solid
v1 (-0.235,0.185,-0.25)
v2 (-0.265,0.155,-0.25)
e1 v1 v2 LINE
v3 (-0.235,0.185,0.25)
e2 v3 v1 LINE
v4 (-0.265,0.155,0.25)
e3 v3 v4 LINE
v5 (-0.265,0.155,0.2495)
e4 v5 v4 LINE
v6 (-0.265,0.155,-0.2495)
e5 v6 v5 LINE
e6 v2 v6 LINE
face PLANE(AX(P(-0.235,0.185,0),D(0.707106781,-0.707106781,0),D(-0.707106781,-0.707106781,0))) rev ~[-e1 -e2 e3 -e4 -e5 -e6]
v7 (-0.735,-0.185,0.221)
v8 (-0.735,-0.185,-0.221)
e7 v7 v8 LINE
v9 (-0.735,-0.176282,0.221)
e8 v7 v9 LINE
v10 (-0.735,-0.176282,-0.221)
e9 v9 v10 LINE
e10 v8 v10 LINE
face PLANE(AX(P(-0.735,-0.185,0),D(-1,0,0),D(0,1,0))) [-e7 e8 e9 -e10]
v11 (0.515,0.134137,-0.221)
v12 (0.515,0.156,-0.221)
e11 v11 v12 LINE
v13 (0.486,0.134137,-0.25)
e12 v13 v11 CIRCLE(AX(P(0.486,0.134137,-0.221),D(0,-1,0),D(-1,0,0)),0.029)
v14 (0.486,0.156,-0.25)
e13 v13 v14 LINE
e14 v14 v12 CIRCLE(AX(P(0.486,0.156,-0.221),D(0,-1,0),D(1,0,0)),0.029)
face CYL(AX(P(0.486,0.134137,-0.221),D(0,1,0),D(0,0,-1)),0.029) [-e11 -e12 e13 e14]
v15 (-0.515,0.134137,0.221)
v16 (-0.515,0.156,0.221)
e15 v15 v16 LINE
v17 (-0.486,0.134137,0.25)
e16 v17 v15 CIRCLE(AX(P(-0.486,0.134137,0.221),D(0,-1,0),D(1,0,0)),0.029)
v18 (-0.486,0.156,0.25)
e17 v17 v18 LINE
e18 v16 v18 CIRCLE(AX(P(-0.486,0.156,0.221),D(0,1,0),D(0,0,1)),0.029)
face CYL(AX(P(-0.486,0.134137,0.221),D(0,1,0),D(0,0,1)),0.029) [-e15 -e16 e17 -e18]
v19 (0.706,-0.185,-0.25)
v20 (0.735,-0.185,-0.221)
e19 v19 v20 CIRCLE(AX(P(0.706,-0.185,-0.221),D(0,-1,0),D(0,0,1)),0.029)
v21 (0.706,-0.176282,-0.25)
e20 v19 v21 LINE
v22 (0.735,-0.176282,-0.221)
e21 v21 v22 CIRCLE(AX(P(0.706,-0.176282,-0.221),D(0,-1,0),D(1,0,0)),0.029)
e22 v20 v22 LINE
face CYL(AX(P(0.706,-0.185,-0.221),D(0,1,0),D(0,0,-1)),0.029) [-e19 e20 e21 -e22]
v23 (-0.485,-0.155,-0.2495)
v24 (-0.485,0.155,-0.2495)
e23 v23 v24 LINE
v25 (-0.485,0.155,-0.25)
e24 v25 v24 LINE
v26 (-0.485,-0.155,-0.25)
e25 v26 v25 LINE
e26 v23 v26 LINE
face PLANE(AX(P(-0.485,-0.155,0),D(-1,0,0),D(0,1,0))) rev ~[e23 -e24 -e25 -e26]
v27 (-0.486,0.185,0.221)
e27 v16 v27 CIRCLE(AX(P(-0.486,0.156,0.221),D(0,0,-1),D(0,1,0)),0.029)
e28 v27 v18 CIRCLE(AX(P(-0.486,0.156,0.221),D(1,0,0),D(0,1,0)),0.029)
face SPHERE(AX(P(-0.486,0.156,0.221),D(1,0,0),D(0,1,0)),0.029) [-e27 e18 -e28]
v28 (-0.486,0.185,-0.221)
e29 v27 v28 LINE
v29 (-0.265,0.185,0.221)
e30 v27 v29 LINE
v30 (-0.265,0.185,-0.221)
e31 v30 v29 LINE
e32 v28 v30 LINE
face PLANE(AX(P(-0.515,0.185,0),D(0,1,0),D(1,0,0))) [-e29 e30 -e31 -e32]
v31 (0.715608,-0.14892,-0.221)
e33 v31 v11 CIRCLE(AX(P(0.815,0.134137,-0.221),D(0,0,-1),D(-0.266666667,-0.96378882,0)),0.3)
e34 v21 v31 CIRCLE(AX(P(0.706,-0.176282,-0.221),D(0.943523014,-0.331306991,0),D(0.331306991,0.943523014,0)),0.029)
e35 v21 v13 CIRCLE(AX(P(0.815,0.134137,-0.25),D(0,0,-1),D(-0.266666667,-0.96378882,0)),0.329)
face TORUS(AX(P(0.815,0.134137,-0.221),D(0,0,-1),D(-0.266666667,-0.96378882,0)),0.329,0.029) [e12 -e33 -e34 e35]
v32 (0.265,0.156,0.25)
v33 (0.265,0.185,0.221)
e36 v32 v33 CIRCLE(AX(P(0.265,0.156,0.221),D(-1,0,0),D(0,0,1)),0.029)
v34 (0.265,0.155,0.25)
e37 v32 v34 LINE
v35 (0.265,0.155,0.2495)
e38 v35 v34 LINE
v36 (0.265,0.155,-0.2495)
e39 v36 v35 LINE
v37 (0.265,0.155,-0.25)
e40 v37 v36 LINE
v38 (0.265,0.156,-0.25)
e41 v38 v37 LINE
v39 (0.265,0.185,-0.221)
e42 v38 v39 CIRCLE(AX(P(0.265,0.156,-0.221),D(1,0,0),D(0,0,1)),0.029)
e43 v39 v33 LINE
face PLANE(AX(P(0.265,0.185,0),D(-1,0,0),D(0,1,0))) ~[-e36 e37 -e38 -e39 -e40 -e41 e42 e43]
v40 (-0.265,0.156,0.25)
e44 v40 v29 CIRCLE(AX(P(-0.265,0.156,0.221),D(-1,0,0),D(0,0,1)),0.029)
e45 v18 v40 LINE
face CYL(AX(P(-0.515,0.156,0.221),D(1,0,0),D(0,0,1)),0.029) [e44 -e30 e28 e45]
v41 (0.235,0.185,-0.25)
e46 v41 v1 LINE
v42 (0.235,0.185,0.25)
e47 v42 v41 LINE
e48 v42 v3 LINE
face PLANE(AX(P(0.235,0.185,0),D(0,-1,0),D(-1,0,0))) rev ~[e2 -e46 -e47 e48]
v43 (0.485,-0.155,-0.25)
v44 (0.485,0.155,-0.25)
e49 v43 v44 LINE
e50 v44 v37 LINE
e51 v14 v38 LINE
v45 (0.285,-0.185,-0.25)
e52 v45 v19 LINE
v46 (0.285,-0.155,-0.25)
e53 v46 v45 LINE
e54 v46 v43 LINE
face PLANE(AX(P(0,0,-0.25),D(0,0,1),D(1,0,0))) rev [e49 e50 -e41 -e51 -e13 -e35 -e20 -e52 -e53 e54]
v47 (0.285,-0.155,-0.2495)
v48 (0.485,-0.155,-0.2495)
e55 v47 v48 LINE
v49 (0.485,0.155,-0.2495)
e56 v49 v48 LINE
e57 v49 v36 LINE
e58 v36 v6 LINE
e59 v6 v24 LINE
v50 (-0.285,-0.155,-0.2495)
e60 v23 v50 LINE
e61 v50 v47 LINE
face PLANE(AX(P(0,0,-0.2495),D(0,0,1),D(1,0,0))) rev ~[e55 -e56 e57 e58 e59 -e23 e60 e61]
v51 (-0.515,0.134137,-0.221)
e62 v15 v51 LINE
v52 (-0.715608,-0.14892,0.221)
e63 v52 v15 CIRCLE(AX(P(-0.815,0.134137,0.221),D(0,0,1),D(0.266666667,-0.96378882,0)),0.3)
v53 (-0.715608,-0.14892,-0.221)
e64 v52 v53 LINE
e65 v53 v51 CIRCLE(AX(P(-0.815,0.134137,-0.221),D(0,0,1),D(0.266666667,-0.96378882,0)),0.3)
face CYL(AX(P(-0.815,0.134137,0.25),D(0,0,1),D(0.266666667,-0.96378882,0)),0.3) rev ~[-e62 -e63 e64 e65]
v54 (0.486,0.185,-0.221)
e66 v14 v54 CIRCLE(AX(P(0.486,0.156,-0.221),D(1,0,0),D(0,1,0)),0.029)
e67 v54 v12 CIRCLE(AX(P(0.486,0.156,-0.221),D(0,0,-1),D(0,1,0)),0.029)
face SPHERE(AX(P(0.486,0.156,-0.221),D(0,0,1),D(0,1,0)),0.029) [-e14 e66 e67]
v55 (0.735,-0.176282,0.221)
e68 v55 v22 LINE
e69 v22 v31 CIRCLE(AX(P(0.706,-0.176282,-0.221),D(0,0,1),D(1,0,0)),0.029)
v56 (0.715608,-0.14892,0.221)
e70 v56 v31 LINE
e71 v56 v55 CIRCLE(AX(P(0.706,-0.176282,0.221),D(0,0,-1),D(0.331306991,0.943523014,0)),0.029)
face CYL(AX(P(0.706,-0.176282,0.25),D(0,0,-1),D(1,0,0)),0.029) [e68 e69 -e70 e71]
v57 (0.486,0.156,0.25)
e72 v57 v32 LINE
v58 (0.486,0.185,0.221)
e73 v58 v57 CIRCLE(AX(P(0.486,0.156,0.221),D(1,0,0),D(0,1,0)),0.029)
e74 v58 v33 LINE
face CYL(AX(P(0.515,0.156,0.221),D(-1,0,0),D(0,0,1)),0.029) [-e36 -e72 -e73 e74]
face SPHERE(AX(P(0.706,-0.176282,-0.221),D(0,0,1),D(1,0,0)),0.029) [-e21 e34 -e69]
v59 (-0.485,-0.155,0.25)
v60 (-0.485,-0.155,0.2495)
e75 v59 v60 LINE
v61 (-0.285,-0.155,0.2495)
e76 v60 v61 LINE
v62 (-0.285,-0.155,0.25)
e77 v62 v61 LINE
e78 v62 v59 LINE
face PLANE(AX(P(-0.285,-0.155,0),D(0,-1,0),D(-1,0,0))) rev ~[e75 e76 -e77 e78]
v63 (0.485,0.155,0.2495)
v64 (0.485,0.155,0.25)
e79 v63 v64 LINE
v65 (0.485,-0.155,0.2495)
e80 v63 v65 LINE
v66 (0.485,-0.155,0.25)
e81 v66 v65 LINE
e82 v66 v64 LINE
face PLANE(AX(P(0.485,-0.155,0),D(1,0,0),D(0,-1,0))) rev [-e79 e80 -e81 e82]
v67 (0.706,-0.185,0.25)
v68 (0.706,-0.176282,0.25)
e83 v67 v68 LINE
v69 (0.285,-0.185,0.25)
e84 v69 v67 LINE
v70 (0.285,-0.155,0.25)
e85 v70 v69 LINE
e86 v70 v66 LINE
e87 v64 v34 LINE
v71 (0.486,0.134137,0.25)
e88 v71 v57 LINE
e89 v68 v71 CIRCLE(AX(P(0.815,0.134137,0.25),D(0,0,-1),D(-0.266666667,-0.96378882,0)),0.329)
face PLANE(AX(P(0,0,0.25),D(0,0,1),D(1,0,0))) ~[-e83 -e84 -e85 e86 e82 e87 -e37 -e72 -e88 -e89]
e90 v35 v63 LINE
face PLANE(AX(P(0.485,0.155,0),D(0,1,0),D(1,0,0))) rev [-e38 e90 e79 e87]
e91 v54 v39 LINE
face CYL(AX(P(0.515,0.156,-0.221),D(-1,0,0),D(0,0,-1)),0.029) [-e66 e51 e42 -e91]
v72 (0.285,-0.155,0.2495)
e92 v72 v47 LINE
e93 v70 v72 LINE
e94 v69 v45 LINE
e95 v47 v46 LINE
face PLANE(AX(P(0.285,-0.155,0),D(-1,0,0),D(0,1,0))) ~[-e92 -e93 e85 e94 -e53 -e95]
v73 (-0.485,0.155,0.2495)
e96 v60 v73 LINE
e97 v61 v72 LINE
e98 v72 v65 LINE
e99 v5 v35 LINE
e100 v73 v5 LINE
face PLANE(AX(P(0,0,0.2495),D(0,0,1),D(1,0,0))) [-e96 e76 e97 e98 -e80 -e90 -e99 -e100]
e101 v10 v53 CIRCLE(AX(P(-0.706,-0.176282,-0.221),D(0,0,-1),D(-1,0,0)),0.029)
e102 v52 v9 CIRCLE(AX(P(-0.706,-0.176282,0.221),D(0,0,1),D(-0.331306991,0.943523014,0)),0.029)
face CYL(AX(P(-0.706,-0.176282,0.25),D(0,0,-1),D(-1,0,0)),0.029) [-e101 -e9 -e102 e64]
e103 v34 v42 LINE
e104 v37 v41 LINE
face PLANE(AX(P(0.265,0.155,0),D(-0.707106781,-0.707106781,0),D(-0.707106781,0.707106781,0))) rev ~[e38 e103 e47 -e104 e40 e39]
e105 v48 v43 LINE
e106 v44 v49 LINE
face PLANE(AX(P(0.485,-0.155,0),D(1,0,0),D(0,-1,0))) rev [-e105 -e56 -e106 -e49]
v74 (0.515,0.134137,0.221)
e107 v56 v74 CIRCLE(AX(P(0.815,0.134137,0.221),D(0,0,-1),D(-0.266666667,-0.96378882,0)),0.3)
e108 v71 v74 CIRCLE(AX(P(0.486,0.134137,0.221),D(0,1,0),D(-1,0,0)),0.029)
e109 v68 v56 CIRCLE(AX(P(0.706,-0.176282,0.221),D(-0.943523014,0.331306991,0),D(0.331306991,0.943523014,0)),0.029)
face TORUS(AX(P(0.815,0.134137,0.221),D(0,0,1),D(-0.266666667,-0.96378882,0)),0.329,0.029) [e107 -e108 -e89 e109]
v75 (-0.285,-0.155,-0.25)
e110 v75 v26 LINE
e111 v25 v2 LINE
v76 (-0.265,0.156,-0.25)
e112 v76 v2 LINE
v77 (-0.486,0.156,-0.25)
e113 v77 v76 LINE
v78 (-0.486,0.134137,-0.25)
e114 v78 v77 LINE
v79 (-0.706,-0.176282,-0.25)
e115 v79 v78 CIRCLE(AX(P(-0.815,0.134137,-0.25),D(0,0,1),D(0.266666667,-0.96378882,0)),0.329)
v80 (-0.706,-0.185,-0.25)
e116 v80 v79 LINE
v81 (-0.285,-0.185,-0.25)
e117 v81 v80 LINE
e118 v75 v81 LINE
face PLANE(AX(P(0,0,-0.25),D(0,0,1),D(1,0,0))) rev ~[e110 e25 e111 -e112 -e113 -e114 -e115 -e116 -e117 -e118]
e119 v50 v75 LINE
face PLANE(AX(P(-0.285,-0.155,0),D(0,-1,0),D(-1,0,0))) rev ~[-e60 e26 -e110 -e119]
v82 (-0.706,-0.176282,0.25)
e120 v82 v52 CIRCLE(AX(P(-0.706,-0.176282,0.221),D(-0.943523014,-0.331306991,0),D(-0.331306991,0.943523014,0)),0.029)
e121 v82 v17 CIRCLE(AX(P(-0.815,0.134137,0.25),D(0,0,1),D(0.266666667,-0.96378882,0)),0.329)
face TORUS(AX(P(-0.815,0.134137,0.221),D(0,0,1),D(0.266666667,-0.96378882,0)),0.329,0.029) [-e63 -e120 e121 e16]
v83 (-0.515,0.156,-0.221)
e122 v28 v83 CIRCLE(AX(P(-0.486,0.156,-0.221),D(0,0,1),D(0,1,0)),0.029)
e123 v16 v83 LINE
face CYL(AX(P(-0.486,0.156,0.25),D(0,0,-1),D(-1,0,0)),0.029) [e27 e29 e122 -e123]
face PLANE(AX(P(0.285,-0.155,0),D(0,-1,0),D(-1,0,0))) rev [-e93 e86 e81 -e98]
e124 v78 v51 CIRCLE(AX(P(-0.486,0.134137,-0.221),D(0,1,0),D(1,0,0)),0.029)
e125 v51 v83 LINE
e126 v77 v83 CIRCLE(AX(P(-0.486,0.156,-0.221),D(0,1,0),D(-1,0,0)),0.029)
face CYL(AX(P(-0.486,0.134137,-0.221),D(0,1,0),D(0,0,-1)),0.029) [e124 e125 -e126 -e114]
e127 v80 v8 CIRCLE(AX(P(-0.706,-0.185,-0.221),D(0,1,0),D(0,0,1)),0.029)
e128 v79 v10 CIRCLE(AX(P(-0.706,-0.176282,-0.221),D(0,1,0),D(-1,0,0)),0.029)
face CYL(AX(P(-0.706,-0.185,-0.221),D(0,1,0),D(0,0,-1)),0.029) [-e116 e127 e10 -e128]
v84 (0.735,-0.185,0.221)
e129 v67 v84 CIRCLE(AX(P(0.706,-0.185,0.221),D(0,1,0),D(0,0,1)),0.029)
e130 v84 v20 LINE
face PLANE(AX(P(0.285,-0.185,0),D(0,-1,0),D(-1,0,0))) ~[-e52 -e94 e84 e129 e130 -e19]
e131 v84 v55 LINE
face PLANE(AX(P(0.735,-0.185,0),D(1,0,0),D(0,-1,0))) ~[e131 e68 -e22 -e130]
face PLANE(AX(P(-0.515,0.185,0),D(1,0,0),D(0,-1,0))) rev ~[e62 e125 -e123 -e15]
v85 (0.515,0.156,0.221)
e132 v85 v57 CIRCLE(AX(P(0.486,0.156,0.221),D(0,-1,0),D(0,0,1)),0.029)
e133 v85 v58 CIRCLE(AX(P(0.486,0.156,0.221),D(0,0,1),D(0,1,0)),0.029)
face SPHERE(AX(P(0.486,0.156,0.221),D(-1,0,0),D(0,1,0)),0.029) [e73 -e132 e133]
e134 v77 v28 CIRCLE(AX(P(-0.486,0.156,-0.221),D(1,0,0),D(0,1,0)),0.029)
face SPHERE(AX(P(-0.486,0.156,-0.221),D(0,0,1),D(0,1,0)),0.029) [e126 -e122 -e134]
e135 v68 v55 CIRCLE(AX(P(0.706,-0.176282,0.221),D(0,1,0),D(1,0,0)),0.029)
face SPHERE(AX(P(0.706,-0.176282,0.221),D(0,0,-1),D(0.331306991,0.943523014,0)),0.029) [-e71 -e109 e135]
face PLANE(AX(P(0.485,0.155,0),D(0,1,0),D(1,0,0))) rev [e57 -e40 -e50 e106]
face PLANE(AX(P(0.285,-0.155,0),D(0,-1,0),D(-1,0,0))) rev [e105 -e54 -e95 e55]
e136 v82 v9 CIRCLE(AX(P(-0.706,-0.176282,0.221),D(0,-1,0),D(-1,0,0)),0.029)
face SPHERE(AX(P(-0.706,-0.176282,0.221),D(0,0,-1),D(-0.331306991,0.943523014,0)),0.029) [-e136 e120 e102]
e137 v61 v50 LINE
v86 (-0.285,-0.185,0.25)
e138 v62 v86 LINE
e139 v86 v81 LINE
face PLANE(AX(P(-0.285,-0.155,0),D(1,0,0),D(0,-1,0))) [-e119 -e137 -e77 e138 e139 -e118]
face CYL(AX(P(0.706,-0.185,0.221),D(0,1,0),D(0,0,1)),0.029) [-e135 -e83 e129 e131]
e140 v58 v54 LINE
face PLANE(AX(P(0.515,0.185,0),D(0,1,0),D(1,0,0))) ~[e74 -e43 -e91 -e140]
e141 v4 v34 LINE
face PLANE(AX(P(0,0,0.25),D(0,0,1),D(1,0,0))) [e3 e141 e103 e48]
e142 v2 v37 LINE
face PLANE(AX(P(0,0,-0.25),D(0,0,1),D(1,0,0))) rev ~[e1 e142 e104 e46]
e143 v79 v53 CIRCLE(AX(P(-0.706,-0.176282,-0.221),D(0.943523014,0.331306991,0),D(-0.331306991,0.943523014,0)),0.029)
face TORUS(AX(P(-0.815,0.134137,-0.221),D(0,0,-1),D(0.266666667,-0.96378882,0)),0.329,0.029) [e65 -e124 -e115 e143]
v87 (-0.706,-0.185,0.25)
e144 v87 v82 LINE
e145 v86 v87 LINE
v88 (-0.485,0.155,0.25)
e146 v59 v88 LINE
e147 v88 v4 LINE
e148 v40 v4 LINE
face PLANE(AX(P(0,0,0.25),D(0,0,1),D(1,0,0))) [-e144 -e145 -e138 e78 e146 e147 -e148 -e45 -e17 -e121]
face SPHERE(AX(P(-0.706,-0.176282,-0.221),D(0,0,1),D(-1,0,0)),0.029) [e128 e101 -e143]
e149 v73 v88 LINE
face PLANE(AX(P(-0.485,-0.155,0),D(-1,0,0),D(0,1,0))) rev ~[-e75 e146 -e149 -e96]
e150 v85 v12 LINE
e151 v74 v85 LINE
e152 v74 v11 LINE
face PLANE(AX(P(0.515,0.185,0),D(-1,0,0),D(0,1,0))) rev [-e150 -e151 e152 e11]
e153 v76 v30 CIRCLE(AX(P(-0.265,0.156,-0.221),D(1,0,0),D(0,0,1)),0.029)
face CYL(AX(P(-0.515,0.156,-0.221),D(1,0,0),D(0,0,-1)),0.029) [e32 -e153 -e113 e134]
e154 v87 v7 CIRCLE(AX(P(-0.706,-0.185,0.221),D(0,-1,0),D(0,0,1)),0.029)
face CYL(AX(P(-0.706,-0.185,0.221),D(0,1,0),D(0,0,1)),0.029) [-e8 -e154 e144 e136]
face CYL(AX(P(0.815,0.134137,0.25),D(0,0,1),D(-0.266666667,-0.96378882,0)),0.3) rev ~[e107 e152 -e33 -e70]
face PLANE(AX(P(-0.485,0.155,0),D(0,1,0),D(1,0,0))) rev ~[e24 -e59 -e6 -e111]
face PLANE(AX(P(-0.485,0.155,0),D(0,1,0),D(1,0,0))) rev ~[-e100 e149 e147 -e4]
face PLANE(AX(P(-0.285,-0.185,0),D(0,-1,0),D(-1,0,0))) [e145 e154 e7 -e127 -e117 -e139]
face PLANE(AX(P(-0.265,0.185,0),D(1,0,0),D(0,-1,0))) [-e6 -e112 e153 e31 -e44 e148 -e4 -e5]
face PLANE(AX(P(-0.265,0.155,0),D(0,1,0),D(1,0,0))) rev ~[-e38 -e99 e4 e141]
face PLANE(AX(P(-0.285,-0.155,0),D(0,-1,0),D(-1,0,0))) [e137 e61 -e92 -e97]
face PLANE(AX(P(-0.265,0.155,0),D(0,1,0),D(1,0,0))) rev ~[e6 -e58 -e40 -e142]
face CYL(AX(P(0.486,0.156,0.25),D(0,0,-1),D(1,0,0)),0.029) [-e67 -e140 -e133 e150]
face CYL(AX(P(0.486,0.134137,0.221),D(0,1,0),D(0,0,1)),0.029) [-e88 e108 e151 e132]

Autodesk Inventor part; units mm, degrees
ref_plane "YZ Plane" through (0, 0, 0) normal (1, 0, 0) x (0, 1, 0)
ref_plane "XZ Plane" through (0, 0, 0) normal (0, 1, 0) x (-1, 0, 0)
ref_plane "XY Plane" through (0, 0, 0) normal (0, 0, 1) x (1, 0, 0)
sketch "Sketch10" plane through (0, 0, 0) normal (0, 0, 1) x (1, 0, 0)
  line L0 (-0.485, 0.155) -> (0.485, 0.155)
  line L1 (0.485, 0.155) -> (0.485, -0.155)
  line L2 (0.485, -0.155) -> (-0.485, -0.155)
  line L3 (-0.485, -0.155) -> (-0.485, 0.155)
  line L4 (-0.265, 0.155) -> (-0.485, 0.155)
  line L5 (-0.515, 0.185) -> (-0.265, 0.185)
  line L6 (-0.265, 0.185) -> (-0.265, 0.155)
  line L7 (-0.515, 0.185) -> (-0.515, -0.155)
  line L8 (-0.485, -0.155) -> (-0.485, 0.155)
  line L9 (-0.285, -0.155) -> (-0.285, -0.185)
  line L10 (-0.285, -0.185) -> (-0.735, -0.185)
  line L11 (-0.735, -0.185) -> (-0.735, -0.155)
  line L12 (-0.735, -0.155) -> (-0.515, -0.155)
  line L13 (-0.485, -0.155) -> (-0.285, -0.155)
  line L14 (-0.265, 0.155) -> (0.265, 0.155)
  line L15 (0.265, 0.155) -> (0.235, 0.185)
  line L16 (0.235, 0.185) -> (-0.235, 0.185)
  line L17 (-0.235, 0.185) -> (-0.265, 0.155)
  point P0 (0, 0)
  point P1 (0, 0.155)
  point P2 (-0.485, 0)
  point P3 (0, 0.185)
  dimension "d11" = 0.2
  dimension "d12" = 0.45
  dimension "d13" = 0.03
  dimension "d14" = 0.03
  dimension "d15" = 0.25
  dimension "d16" = 45
  dimension "d19" = 0.03
  dimension "d21" = 1
  dimension "d22" = 0.37
extrude "Extrusion4" add sketch "Sketch10" along normal mid plane 0.499 contours L0 L1 L2 L3
extrude "Extrusion5" add sketch "Sketch10" along normal mid plane 0.5 contours L3 L2 L9 L10 L11 L12 L7 L5 L6 L0 | L17 L16 L15 L0
fillet "Fillet2" radius 0.3 1 edges at (-0.515, -0.155, 0)
fillet "Fillet3" radius 0.029 10 edges at (-0.39, 0.185, 0.25) (-0.515, 0.185, 0) (-0.39, 0.185, -0.25) (-0.5763, -0.0475, -0.25) (-0.515, 0.1596, -0.25) (-0.5763, -0.0475, 0.25) (-0.515, 0.1596, 0.25) (-0.735, -0.17, 0.25) (-0.735, -0.155, 0) (-0.735, -0.17, -0.25)
mirror "Mirror1" about plane through (0, 0, 0) normal (1, 0, 0) of "Extrusion5", "Fillet2", "Fillet3"
equation "\"d14\" = d13"
equation "\"d19\" = d13"
properties part number "AC0402JR-0724KL Resistor"
